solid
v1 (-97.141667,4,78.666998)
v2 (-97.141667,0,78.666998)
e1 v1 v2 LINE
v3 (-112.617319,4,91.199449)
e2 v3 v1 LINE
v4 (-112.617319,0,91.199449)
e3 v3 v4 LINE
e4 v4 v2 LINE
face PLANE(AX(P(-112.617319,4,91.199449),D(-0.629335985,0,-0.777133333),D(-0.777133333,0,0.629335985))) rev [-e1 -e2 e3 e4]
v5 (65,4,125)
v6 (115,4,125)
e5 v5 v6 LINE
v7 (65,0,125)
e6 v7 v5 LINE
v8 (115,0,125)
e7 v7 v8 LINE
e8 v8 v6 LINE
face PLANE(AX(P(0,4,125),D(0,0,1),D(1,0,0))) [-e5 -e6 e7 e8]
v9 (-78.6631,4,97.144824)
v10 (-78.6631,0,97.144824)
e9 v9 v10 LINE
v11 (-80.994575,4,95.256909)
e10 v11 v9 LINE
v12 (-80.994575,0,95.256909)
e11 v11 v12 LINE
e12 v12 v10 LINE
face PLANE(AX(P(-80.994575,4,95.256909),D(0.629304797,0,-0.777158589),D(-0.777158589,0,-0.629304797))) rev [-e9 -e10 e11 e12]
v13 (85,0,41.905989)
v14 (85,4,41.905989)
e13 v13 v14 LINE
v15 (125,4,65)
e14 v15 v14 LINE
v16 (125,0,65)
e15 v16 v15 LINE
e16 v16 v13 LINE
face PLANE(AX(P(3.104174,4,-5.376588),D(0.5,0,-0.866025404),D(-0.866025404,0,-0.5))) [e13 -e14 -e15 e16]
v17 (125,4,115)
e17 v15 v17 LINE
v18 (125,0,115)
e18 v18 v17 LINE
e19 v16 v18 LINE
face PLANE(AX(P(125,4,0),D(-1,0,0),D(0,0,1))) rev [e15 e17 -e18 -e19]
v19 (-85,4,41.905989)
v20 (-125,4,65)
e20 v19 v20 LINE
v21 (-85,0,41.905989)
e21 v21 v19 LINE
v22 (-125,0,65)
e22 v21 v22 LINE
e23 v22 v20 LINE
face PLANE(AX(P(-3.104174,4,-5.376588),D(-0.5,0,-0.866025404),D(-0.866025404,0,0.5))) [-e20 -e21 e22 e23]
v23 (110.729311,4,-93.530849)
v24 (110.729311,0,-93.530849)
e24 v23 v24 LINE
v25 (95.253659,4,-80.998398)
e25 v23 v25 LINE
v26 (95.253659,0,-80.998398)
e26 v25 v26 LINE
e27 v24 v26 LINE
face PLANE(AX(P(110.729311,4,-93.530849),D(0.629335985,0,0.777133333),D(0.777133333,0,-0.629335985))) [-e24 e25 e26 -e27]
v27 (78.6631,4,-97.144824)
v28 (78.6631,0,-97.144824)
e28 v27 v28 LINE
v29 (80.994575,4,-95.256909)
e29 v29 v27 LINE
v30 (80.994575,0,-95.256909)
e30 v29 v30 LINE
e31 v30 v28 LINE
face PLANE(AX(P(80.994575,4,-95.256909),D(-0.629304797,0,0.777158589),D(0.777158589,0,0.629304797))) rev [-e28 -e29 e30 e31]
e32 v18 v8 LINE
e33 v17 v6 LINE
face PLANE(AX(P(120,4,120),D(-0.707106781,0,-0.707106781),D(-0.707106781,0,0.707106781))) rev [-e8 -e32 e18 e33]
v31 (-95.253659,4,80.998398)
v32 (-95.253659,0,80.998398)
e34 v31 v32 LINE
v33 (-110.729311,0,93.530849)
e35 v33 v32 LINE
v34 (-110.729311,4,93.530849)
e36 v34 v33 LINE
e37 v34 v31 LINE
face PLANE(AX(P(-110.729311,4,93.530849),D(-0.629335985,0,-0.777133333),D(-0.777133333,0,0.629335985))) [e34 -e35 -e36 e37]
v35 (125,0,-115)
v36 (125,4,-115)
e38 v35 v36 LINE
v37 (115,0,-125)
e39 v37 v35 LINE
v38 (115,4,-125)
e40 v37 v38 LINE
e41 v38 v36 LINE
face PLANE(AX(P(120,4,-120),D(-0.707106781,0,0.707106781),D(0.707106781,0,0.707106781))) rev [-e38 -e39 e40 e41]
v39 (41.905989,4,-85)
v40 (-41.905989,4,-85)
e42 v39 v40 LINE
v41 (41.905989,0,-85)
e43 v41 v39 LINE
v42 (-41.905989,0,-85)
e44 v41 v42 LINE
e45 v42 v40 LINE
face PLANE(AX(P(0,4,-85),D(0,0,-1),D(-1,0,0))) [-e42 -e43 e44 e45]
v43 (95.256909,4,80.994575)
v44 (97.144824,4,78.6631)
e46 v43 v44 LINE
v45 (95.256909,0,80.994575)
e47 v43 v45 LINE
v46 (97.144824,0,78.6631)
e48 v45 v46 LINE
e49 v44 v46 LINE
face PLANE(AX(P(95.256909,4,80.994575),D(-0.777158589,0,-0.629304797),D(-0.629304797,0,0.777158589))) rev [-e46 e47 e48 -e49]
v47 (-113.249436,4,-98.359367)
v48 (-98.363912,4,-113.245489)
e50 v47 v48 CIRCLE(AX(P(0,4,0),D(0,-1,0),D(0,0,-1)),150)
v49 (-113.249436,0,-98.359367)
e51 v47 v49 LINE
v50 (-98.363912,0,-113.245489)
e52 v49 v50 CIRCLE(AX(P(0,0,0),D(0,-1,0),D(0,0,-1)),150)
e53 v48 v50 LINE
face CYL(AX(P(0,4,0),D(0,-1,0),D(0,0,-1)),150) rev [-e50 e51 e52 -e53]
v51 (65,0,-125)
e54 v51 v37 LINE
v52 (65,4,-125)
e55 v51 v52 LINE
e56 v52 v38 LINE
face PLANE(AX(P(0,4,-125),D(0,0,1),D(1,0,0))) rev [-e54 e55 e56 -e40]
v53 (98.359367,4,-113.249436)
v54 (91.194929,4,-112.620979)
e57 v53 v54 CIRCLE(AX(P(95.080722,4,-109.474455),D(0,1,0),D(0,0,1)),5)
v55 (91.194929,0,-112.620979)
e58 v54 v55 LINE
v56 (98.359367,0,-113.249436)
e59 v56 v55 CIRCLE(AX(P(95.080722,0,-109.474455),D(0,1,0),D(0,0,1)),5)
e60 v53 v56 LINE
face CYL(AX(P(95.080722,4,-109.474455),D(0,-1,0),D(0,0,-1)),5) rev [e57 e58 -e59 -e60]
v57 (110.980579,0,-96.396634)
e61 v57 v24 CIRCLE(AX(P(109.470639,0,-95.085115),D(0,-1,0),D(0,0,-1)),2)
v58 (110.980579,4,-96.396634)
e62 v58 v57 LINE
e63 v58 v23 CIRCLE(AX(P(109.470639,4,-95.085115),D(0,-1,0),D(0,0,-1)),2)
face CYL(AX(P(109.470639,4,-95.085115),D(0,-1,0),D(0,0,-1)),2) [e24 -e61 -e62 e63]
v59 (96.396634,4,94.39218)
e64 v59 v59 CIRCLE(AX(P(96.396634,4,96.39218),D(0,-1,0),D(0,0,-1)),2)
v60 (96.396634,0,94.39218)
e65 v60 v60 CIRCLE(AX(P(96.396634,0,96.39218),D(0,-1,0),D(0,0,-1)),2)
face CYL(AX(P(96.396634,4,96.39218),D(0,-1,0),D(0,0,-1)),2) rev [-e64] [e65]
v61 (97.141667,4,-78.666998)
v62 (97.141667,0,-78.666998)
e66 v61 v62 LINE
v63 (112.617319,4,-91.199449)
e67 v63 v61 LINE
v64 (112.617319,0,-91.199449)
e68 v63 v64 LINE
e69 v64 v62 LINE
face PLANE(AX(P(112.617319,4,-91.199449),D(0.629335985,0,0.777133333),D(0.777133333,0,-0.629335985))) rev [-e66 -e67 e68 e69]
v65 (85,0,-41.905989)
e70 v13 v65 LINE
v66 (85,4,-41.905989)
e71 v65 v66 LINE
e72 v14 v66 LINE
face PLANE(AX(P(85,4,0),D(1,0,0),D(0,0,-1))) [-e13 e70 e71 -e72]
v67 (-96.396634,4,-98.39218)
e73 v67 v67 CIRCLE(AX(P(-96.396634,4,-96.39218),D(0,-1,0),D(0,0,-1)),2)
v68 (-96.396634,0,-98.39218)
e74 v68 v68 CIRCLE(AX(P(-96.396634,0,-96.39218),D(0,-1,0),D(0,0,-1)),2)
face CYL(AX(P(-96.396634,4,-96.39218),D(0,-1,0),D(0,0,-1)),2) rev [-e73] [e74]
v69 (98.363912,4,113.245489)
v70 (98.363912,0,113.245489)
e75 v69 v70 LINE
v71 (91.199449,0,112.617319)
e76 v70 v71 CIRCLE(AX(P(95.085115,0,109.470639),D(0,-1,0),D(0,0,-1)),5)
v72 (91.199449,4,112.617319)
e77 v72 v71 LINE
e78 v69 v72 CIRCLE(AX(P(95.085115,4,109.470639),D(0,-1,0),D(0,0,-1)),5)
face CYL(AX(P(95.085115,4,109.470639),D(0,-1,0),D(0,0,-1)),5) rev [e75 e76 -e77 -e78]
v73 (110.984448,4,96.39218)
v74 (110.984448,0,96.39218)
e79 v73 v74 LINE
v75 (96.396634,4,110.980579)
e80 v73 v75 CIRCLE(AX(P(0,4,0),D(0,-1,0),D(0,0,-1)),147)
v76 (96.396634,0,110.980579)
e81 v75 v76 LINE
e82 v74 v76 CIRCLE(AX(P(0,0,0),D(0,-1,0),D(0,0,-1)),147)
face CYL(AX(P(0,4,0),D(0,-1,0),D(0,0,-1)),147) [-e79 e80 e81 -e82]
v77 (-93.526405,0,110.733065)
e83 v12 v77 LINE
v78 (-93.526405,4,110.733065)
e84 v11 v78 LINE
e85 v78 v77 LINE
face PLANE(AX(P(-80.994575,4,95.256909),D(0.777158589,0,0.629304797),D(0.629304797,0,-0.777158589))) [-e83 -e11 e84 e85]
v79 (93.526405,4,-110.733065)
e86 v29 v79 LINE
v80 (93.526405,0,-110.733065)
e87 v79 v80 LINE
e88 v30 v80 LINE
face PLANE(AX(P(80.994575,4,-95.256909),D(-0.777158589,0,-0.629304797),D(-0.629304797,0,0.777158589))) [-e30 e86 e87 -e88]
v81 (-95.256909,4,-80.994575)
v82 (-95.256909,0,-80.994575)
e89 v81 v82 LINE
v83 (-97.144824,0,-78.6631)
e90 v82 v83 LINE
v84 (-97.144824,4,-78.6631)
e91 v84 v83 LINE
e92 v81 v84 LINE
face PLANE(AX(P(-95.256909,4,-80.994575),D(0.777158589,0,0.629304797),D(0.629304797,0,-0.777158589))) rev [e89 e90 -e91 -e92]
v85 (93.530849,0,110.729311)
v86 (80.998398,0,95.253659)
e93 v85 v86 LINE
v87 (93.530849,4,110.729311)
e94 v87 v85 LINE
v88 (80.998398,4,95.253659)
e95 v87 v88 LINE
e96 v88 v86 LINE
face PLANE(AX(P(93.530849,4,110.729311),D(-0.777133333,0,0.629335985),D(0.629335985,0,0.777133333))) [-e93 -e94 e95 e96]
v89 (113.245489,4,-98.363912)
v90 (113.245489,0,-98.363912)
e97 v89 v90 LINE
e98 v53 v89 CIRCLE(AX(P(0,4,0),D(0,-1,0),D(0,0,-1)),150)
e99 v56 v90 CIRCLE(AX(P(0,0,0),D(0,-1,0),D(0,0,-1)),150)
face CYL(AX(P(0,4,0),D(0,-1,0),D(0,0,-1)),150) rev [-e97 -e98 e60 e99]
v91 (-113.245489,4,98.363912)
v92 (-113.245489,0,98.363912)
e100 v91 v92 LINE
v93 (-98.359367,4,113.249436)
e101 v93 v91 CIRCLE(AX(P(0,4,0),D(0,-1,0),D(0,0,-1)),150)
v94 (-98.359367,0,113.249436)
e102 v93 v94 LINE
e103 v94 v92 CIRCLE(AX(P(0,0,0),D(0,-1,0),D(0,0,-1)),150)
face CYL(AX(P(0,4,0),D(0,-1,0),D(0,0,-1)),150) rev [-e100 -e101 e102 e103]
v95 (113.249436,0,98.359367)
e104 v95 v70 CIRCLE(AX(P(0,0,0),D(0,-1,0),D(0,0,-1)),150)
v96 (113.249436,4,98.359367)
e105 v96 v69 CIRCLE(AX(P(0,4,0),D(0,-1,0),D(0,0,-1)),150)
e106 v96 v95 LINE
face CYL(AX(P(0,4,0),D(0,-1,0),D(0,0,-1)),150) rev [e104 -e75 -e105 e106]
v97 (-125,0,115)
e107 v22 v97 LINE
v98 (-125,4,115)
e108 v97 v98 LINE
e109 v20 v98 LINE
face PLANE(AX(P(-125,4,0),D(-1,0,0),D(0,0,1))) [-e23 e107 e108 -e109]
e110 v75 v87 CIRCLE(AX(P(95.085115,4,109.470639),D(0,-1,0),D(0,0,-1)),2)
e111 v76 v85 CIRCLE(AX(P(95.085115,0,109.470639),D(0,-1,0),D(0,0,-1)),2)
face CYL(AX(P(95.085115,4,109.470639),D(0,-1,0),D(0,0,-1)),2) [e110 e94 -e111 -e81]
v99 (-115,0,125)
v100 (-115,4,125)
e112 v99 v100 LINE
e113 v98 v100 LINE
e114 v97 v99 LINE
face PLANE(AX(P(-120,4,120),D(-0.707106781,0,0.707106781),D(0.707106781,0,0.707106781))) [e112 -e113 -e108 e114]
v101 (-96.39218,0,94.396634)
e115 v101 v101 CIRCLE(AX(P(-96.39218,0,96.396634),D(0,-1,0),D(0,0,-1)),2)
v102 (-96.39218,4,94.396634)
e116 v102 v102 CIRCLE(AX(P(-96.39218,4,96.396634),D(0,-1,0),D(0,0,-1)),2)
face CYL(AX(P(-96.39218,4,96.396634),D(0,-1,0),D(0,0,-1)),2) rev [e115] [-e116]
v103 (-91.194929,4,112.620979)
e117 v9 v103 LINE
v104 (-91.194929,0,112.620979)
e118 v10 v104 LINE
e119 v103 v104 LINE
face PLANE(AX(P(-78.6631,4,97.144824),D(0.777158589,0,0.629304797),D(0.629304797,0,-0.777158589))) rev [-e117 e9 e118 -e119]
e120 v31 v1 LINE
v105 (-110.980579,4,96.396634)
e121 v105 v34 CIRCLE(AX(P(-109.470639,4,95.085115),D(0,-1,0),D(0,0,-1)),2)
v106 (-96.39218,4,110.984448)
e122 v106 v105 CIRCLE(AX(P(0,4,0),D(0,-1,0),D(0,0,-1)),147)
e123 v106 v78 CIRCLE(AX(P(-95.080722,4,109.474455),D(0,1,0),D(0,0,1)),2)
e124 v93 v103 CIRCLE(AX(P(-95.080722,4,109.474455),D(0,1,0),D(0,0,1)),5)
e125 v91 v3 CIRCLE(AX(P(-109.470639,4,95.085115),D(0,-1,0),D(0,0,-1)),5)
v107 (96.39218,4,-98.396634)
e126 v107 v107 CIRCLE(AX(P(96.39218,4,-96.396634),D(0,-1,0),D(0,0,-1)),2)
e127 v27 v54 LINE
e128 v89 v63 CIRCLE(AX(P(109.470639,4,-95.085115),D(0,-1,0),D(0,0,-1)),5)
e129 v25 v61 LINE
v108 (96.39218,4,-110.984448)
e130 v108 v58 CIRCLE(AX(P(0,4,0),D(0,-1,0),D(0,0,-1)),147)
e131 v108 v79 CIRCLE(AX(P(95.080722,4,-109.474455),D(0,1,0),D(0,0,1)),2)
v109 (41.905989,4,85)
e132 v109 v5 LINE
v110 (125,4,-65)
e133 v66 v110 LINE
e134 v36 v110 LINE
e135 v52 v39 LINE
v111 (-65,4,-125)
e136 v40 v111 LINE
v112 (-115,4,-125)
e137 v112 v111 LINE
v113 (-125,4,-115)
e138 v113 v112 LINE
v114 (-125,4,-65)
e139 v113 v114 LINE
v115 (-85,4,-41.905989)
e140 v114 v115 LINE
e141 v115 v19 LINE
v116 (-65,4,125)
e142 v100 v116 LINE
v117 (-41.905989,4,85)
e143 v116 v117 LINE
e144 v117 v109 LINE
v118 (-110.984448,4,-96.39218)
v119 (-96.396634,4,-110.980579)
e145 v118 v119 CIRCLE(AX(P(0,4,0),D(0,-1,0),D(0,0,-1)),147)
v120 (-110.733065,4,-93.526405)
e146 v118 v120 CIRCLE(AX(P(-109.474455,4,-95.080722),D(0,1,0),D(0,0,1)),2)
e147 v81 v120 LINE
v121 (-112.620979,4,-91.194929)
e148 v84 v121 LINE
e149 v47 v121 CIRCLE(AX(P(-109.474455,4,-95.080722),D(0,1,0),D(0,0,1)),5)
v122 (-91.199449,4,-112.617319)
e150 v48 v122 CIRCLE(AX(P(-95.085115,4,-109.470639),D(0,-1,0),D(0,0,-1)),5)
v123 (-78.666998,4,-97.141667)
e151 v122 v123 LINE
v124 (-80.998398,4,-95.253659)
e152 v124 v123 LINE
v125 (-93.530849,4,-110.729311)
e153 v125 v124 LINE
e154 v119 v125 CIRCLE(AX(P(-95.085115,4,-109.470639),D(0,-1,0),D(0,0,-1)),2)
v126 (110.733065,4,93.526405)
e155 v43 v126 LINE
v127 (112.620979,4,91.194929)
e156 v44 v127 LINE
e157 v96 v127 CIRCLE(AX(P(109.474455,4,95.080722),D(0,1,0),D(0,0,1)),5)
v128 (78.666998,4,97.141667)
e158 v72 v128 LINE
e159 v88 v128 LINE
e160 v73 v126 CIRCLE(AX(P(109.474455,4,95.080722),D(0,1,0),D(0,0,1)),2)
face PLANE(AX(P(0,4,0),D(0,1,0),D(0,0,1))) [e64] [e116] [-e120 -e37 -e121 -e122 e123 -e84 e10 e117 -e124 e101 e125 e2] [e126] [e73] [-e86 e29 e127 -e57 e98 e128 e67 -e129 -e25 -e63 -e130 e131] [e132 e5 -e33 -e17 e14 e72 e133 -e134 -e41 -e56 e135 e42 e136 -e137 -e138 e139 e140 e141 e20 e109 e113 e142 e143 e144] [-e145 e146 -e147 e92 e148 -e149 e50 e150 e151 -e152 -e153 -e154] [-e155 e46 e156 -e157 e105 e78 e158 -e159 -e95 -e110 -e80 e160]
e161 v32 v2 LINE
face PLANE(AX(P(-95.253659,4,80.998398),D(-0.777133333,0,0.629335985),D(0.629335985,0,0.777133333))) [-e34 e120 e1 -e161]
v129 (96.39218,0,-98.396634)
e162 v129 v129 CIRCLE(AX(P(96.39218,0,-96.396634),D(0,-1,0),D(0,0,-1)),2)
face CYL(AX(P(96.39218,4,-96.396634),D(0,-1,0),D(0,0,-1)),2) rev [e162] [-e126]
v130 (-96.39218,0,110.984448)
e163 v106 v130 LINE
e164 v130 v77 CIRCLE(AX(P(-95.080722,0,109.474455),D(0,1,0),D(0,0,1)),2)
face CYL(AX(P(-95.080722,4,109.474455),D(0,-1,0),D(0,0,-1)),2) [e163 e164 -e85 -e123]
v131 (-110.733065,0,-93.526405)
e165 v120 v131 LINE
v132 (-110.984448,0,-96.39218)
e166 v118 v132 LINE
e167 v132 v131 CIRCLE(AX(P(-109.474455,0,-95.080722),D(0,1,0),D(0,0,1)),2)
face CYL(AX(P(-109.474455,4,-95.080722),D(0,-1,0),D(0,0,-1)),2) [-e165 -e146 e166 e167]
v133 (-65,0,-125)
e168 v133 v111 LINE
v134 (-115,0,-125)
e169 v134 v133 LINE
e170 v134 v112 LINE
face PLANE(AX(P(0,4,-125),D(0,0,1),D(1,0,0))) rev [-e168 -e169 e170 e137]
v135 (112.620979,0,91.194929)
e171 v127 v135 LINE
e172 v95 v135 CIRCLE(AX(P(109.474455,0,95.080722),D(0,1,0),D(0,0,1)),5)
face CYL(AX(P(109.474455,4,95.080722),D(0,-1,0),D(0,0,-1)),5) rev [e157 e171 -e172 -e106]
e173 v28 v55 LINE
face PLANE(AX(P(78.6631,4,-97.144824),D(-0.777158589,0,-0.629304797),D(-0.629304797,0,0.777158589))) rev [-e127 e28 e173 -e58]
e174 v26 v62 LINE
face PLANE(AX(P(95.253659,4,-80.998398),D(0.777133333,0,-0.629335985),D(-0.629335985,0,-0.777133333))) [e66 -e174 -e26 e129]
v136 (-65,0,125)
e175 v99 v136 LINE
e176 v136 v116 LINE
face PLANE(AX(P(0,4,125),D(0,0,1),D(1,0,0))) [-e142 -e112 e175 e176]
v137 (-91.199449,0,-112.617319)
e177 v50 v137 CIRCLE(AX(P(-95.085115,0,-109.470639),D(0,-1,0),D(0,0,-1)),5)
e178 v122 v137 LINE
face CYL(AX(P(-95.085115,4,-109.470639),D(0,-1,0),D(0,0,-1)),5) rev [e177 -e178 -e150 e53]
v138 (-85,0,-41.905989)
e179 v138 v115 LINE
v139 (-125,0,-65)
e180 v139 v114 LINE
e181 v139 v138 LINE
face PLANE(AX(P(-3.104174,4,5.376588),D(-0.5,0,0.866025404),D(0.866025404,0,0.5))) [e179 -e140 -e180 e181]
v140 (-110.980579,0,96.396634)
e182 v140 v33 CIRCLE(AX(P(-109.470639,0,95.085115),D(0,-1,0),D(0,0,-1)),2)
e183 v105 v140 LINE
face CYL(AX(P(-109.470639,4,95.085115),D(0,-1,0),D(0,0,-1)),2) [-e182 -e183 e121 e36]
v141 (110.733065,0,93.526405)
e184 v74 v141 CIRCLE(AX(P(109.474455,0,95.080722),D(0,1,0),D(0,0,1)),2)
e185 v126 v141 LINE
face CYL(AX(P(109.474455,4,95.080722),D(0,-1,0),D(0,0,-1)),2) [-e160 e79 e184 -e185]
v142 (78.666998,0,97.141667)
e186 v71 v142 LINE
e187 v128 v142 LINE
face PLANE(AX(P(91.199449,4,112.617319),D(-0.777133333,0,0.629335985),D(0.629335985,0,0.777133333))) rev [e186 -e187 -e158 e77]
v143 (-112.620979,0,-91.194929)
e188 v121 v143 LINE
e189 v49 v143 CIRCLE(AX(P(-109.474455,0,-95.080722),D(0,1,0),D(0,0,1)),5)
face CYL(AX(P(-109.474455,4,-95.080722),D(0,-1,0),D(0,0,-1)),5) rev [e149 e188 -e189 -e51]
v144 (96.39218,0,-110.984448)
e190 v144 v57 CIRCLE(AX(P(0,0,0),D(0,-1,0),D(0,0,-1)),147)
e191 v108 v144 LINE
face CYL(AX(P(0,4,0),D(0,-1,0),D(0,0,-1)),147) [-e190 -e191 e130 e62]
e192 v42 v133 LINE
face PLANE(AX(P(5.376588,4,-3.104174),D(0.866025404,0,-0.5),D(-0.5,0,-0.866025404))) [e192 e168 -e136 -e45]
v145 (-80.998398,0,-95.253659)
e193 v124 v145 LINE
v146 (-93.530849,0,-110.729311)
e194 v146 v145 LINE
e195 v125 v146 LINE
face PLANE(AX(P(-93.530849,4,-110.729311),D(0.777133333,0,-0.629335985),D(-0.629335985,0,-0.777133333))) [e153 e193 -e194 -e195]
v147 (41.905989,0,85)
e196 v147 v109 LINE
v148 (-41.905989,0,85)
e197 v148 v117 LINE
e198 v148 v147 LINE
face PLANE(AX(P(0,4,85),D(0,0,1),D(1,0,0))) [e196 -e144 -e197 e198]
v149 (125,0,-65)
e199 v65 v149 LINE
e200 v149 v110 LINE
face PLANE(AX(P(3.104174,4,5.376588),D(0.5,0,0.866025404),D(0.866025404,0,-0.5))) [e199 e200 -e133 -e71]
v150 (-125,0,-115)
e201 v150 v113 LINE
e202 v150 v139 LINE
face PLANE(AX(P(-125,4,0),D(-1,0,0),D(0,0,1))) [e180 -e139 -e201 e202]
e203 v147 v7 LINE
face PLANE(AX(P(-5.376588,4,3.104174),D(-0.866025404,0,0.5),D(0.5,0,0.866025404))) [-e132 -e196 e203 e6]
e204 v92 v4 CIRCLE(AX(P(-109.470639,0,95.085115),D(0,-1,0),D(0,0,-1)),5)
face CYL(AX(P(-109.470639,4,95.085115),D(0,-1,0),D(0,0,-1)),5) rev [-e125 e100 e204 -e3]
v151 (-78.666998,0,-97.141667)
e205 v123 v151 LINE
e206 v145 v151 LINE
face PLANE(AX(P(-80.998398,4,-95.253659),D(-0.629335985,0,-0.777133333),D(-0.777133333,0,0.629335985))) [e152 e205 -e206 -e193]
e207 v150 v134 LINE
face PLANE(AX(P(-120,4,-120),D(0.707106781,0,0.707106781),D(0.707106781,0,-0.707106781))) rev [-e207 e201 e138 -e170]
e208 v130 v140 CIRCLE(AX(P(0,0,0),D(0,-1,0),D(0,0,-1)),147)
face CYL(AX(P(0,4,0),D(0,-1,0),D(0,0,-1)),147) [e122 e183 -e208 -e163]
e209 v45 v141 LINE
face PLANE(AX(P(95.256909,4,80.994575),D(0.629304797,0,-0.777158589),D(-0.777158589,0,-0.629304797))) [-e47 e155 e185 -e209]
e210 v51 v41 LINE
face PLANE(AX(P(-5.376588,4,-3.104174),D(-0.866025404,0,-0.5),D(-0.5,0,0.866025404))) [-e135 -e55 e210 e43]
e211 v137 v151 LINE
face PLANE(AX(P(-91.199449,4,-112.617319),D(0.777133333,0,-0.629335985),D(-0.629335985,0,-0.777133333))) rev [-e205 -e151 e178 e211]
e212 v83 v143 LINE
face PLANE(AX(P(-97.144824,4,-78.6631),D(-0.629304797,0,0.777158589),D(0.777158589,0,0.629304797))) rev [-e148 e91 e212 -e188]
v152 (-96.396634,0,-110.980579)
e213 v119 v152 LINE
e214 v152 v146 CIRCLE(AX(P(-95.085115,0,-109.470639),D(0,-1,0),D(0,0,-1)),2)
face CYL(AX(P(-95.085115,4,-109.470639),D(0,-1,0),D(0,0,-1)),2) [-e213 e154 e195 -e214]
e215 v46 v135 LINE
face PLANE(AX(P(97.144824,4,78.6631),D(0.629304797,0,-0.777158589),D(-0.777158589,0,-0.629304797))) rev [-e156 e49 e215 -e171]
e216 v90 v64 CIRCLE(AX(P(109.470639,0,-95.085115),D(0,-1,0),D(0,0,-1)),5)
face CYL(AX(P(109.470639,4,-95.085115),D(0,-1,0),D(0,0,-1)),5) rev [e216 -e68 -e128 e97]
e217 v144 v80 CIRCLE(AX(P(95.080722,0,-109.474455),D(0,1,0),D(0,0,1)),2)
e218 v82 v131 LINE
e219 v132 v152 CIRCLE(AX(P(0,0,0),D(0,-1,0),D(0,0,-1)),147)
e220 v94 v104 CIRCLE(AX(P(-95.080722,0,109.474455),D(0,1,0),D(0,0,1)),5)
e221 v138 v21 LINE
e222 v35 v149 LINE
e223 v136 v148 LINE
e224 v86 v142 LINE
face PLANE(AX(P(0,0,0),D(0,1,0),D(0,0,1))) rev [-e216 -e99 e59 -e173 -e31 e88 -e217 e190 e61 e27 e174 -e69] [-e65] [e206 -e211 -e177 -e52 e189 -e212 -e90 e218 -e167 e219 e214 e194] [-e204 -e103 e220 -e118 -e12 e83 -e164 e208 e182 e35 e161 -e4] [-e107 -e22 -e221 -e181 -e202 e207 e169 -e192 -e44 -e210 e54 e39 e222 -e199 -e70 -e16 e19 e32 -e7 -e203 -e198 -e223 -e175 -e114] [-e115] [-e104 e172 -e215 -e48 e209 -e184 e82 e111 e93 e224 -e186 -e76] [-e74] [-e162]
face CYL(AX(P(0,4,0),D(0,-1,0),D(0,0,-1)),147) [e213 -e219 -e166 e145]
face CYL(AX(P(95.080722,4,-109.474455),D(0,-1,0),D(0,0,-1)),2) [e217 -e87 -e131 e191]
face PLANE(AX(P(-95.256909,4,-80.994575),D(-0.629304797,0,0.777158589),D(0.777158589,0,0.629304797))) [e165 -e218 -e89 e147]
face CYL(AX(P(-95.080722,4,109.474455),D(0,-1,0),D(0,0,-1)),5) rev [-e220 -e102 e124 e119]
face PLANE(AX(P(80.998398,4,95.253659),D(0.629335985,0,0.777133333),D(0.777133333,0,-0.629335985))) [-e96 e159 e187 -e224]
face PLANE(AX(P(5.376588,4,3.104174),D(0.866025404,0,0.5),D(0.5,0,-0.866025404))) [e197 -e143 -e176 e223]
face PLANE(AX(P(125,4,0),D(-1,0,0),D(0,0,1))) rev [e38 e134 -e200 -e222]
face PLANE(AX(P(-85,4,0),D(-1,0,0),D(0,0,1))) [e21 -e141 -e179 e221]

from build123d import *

# Parameters (mm, degrees)
BOSS_EXTRUDE1_DEPTH = 4
SKETCH7_R           = 2
CUT_EXTRUDE1_DEPTH  = 4


with BuildPart() as part:
    # Sketch1 → Boss-Extrude1 (new body)
    with BuildSketch(Plane(origin=(0, 0, 0), x_dir=(1, 0, 0), z_dir=(0, 1, 0))):
        Polygon((-125, 115), (-125, 65), (-85, 41.905989232), (-85, -41.905989232), (-125, -65), (-125, -115), (-115, -125), (-65, -125), (-41.905989232, -85), (41.905989232, -85), (65, -125), (115, -125), (125, -115), (125, -65), (85, -41.905989232), (85, 41.905989232), (125, 65), (125, 115), (115, 125), (65, 125), (41.905989232, 85), (-41.905989232, 85), (-65, 125), (-115, 125), align=None)
    extrude(amount=BOSS_EXTRUDE1_DEPTH)

    # Sketch7 → Cut-Extrude1 (cut)
    with BuildSketch(Plane.XZ):
        with Locations(Location((96.392180149, -96.396634108, 0), (0, 0, 270))):
            Circle(SKETCH7_R)
        with Locations(Location((-96.396634108, -96.392180149, 0), (0, 0, 270))):
            Circle(SKETCH7_R)
        with Locations(Location((-96.392180149, 96.396634108, 0), (0, 0, 270))):
            Circle(SKETCH7_R)
        with Locations(Location((96.396634108, 96.392180149, 0), (0, 0, 270))):
            Circle(SKETCH7_R)
        with BuildLine():
            Line((112.617319154, -91.199448609), (97.141666667, -78.666998145))
            Line((97.141666667, -78.666998145), (95.253658711, -80.998398145))
            Line((95.253658711, -80.998398145), (110.729311198, -93.530848609))
            ThreePointArc((110.729311198, -93.530848609), (111.462995743, -94.910428371), (110.980579079, -96.396634108))
            ThreePointArc((110.980579079, -96.396634108), (103.942611055, -103.946782572), (96.392180149, -110.984447587))
            ThreePointArc((96.392180149, -110.984447587), (94.905955053, -111.466804606), (93.526404737, -110.733064696))
            Line((93.526404737, -110.733064696), (80.994575353, -95.256909268))
            Line((80.994575353, -95.256909268), (78.663099585, -97.144823658))
            Line((78.663099585, -97.144823658), (91.194928969, -112.620979086))
            ThreePointArc((91.194928969, -112.620979086), (94.643804759, -114.455328861), (98.359367499, -113.249436313))
            ThreePointArc((98.359367499, -113.249436313), (106.063888832, -106.068145481), (113.245488856, -98.363912355))
            ThreePointArc((113.245488856, -98.363912355), (114.451530517, -94.648398013), (112.617319154, -91.199448609))
        make_face()
        with BuildLine():
            Line((-91.199448609, -112.617319154), (-78.666998145, -97.141666667))
            Line((-78.666998145, -97.141666667), (-80.998398145, -95.253658711))
            Line((-80.998398145, -95.253658711), (-93.530848609, -110.729311198))
            ThreePointArc((-93.530848609, -110.729311198), (-94.910428371, -111.462995743), (-96.396634108, -110.980579079))
            ThreePointArc((-96.396634108, -110.980579079), (-103.946782572, -103.942611055), (-110.984447587, -96.392180149))
            ThreePointArc((-110.984447587, -96.392180149), (-111.466804606, -94.905955053), (-110.733064696, -93.526404737))
            Line((-110.733064696, -93.526404737), (-95.256909268, -80.994575353))
            Line((-95.256909268, -80.994575353), (-97.144823658, -78.663099585))
            Line((-97.144823658, -78.663099585), (-112.620979086, -91.194928969))
            ThreePointArc((-112.620979086, -91.194928969), (-114.455328861, -94.643804759), (-113.249436313, -98.359367499))
            ThreePointArc((-113.249436313, -98.359367499), (-106.068145481, -106.063888832), (-98.363912355, -113.245488856))
            ThreePointArc((-98.363912355, -113.245488856), (-94.648398013, -114.451530517), (-91.199448609, -112.617319154))
        make_face()
        with BuildLine():
            Line((-112.617319154, 91.199448609), (-97.141666667, 78.666998145))
            Line((-97.141666667, 78.666998145), (-95.253658711, 80.998398145))
            Line((-95.253658711, 80.998398145), (-110.729311198, 93.530848609))
            ThreePointArc((-110.729311198, 93.530848609), (-111.462995743, 94.910428371), (-110.980579079, 96.396634108))
            ThreePointArc((-110.980579079, 96.396634108), (-103.942611055, 103.946782572), (-96.392180149, 110.984447587))
            ThreePointArc((-96.392180149, 110.984447587), (-94.905955053, 111.466804606), (-93.526404737, 110.733064696))
            Line((-93.526404737, 110.733064696), (-80.994575353, 95.256909268))
            Line((-80.994575353, 95.256909268), (-78.663099585, 97.144823658))
            Line((-78.663099585, 97.144823658), (-91.194928969, 112.620979086))
            ThreePointArc((-91.194928969, 112.620979086), (-94.643804759, 114.455328861), (-98.359367499, 113.249436313))
            ThreePointArc((-98.359367499, 113.249436313), (-106.063888832, 106.068145481), (-113.245488856, 98.363912355))
            ThreePointArc((-113.245488856, 98.363912355), (-114.451530517, 94.648398013), (-112.617319154, 91.199448609))
        make_face()
        with BuildLine():
            Line((91.199448609, 112.617319154), (78.666998145, 97.141666667))
            Line((78.666998145, 97.141666667), (80.998398145, 95.253658711))
            Line((80.998398145, 95.253658711), (93.530848609, 110.729311198))
            ThreePointArc((93.530848609, 110.729311198), (94.910428371, 111.462995743), (96.396634108, 110.980579079))
            ThreePointArc((96.396634108, 110.980579079), (103.946782572, 103.942611055), (110.984447587, 96.392180149))
            ThreePointArc((110.984447587, 96.392180149), (111.466804606, 94.905955053), (110.733064696, 93.526404737))
            Line((110.733064696, 93.526404737), (95.256909268, 80.994575353))
            Line((95.256909268, 80.994575353), (97.144823658, 78.663099585))
            Line((97.144823658, 78.663099585), (112.620979086, 91.194928969))
            ThreePointArc((112.620979086, 91.194928969), (114.455328861, 94.643804759), (113.249436313, 98.359367499))
            ThreePointArc((113.249436313, 98.359367499), (106.068145481, 106.063888832), (98.363912355, 113.245488856))
            ThreePointArc((98.363912355, 113.245488856), (94.648398013, 114.451530517), (91.199448609, 112.617319154))
        make_face()
    extrude(amount=-CUT_EXTRUDE1_DEPTH, mode=Mode.SUBTRACT)


solid = part.part
